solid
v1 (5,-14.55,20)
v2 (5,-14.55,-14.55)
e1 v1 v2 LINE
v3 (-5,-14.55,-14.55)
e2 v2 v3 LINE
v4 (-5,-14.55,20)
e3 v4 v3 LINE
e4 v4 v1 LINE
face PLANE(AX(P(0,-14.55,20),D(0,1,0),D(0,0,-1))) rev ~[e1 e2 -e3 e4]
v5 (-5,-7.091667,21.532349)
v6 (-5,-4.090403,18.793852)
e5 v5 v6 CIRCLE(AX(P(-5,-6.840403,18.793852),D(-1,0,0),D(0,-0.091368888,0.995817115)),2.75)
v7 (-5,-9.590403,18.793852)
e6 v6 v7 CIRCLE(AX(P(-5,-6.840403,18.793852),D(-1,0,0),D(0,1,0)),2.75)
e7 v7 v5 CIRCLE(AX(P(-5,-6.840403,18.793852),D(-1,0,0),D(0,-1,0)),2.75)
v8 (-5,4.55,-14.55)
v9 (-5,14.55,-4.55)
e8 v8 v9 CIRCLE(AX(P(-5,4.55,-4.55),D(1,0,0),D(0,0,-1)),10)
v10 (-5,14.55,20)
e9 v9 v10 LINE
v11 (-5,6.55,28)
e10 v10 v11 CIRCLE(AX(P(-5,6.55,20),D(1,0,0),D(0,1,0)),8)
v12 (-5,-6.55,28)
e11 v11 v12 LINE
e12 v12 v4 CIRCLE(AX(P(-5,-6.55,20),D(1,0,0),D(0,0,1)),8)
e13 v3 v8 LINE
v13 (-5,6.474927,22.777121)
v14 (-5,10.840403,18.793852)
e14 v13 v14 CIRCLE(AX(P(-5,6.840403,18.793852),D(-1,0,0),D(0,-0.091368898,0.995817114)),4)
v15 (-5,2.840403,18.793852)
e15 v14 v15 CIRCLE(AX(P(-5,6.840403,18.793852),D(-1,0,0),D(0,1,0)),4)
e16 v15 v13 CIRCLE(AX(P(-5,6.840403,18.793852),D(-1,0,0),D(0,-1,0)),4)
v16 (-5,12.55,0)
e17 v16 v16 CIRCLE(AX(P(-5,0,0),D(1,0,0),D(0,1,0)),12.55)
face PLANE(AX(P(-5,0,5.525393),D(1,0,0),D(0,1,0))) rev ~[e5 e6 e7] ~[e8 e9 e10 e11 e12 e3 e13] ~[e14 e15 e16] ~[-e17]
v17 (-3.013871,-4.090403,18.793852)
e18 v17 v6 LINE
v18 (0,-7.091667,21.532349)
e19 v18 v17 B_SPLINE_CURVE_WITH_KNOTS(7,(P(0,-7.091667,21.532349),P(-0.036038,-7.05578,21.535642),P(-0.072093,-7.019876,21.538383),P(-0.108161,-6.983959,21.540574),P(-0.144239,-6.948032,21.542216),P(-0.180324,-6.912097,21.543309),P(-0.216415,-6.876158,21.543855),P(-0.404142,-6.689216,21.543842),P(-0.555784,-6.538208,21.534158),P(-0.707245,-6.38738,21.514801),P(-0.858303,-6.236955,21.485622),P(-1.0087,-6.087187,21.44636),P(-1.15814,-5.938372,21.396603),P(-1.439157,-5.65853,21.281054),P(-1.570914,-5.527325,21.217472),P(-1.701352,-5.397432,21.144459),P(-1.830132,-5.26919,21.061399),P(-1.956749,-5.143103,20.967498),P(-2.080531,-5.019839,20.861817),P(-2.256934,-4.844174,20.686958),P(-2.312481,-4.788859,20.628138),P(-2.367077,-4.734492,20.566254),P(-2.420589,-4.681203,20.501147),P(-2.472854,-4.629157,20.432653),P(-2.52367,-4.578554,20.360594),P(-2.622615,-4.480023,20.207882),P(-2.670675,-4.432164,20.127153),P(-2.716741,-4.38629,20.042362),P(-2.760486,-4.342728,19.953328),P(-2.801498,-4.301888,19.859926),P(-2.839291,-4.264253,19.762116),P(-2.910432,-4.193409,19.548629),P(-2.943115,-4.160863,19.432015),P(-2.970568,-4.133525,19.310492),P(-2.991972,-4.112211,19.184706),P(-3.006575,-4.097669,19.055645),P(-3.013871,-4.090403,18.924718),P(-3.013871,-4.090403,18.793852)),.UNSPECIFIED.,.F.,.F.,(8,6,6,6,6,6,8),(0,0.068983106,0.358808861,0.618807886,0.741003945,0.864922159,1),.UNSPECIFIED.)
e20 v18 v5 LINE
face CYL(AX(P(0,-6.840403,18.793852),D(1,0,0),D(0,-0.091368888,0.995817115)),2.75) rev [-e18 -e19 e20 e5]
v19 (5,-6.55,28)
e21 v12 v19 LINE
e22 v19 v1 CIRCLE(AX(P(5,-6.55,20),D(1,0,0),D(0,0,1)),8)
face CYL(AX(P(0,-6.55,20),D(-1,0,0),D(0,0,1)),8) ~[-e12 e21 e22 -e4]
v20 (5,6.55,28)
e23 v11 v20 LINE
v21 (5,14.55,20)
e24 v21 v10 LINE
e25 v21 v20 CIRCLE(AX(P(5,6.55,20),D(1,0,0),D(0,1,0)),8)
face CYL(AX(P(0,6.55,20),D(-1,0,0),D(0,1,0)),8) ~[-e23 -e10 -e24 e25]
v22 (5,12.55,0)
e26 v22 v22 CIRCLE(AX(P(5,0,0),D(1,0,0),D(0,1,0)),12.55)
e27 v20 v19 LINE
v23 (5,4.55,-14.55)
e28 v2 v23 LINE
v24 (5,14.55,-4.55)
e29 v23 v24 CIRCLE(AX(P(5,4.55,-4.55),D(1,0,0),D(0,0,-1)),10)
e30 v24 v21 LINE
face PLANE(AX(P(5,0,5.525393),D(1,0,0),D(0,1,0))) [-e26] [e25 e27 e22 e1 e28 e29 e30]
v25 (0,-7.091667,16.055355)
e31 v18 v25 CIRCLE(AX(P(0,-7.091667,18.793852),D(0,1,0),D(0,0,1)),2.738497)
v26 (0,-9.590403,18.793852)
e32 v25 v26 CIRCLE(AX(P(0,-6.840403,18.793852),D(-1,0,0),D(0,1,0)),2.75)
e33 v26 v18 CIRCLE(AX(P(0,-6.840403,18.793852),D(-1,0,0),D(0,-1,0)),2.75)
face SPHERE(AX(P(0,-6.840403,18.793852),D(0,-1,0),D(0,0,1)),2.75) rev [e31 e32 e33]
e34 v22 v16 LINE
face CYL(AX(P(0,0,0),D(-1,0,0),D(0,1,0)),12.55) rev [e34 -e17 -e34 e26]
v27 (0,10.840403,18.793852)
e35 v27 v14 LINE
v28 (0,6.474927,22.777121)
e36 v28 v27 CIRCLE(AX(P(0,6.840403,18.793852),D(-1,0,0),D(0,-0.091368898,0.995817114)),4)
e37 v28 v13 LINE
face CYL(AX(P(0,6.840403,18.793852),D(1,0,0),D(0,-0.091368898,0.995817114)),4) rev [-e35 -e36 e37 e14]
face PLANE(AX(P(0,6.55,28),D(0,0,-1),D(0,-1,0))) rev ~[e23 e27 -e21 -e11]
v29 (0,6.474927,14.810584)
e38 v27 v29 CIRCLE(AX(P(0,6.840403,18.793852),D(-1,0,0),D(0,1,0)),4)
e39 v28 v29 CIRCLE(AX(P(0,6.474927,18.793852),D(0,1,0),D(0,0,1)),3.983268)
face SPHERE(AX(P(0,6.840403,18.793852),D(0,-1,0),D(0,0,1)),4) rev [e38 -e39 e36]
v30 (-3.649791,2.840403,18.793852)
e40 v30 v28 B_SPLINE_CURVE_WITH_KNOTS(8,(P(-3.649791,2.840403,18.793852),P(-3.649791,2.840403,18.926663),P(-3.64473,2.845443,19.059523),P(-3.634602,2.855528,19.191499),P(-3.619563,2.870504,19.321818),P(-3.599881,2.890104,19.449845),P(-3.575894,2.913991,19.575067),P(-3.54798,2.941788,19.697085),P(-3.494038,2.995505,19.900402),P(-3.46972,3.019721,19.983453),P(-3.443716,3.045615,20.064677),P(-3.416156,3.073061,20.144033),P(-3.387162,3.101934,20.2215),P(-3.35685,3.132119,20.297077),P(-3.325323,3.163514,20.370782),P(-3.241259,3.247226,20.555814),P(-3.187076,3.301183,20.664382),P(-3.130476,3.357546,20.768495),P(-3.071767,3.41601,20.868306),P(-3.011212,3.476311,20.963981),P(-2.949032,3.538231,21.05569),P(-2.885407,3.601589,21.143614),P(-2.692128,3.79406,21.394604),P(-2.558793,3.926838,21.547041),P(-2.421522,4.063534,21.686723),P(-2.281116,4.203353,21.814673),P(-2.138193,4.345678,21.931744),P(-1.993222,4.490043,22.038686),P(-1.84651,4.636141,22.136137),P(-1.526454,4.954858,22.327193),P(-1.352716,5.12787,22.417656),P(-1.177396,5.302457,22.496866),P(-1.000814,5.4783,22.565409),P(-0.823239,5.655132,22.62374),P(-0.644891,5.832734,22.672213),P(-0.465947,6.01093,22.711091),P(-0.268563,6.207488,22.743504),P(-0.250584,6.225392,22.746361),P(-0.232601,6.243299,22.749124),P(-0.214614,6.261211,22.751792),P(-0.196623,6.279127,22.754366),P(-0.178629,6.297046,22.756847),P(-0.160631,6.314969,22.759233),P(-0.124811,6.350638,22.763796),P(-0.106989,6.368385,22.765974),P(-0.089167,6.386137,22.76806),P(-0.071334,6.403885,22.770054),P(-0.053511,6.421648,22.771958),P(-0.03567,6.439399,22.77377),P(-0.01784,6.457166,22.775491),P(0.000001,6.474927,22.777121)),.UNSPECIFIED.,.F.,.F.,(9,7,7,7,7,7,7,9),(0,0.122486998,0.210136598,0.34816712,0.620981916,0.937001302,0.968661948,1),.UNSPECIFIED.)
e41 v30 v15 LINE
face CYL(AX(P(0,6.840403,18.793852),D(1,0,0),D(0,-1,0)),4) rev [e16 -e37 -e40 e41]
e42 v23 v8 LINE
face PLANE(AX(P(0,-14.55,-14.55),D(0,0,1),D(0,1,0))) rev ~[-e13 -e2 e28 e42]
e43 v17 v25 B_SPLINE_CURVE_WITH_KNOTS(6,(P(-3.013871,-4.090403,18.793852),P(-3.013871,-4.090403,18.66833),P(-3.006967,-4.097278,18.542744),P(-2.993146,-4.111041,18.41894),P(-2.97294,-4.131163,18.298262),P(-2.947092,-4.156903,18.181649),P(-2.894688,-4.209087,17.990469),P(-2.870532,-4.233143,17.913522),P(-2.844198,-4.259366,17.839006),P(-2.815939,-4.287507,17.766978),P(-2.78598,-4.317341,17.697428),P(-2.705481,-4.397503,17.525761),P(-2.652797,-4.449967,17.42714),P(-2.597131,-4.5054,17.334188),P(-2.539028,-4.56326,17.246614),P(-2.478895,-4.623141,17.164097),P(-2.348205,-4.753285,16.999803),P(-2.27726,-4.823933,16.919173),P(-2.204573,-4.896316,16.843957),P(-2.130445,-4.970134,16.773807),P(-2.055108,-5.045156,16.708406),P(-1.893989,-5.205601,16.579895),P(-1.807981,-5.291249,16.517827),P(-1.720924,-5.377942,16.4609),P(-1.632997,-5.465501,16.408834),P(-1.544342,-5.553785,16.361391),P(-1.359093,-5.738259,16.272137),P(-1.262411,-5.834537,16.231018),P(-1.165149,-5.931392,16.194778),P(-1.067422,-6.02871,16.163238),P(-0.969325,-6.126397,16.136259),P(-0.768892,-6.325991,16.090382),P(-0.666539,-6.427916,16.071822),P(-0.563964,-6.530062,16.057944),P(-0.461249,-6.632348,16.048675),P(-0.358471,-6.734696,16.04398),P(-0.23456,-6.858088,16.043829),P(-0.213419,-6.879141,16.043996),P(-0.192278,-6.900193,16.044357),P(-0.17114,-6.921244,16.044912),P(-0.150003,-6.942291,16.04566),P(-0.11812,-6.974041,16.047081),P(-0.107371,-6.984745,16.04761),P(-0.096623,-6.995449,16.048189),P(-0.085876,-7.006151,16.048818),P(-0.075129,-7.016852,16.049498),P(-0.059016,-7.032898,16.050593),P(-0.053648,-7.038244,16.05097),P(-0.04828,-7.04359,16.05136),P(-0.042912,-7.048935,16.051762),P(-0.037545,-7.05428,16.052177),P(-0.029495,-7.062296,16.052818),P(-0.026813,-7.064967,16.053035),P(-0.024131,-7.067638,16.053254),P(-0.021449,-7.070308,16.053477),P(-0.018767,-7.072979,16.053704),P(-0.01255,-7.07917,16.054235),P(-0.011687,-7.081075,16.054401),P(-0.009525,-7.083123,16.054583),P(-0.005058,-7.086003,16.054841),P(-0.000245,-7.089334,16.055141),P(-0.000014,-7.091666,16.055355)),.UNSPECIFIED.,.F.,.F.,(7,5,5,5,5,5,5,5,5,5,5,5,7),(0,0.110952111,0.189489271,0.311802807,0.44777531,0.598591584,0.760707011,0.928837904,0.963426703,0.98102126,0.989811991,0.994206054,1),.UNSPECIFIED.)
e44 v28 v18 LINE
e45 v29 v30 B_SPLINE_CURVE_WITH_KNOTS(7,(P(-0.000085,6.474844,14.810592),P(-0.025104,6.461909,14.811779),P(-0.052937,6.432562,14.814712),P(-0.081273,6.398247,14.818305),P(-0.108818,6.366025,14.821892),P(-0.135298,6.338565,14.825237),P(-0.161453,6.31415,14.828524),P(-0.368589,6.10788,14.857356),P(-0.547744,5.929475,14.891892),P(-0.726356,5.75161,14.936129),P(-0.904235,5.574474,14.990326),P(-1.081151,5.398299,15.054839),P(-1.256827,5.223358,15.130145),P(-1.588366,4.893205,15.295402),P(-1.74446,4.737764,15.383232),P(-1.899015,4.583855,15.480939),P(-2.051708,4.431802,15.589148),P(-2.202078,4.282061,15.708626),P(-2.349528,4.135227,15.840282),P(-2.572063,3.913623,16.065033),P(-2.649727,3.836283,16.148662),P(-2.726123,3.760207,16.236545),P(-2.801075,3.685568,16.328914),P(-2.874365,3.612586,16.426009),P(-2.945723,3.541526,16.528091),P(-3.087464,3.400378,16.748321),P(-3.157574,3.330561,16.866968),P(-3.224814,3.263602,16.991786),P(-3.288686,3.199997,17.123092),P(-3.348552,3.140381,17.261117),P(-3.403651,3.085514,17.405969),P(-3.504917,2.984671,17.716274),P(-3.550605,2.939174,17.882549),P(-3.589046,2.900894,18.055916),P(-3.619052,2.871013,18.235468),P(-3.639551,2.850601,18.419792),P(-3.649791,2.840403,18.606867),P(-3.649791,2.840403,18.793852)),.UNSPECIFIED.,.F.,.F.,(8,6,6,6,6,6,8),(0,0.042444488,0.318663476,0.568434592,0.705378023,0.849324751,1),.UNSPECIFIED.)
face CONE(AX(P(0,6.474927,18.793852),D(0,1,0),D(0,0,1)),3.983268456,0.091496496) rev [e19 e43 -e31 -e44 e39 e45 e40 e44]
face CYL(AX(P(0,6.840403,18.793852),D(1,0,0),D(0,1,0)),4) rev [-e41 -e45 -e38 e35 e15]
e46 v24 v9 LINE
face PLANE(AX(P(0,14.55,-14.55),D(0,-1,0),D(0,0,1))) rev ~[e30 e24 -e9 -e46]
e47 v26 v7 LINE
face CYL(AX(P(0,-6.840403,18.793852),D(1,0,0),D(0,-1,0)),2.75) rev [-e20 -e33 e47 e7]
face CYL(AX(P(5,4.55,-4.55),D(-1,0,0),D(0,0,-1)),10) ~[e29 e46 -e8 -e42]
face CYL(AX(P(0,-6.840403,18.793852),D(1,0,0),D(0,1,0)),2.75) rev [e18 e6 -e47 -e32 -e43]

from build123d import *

# Parameters (mm, degrees)
F0_R     = 12.55
F1_DEPTH = 5
F2_DEPTH = 5
F3_R     = 10


with BuildPart() as f1:
    # F0 (on Right) → F1 (new body)
    with BuildSketch(Plane.YZ):
        with BuildLine():
            ThreePointArc((14.55, 20), (12.2068542495, 25.6568542495), (6.55, 28))
            Line((6.55, 28), (-6.55, 28))
            ThreePointArc((-6.55, 28), (-12.2068542495, 25.6568542495), (-14.55, 20))
            Line((-14.55, 20), (-14.55, -14.55))
            Line((-14.55, -14.55), (14.55, -14.55))
            Line((14.55, -14.55), (14.55, 20))
        make_face()
        Circle(F0_R, mode=Mode.SUBTRACT)
        with BuildLine():
            Line((2.8404028665, 18.7938524157), (-4.0904028665, 18.7938524157))
            ThreePointArc((-4.0904028665, 18.7938524157), (-6.8404028665, 16.0438524157), (-9.5904028665, 18.7938524157))
            ThreePointArc((-9.5904028665, 18.7938524157), (-8.8718404378, 20.6474331111), (-7.0916673072, 21.5323494818))
            Line((-7.0916673072, 21.5323494818), (6.4749272755, 22.7771208717))
            ThreePointArc((6.4749272755, 22.7771208717), (9.5365202263, 21.748670715), (10.8404028665, 18.7938524157))
            ThreePointArc((10.8404028665, 18.7938524157), (6.8404028665, 14.7938524157), (2.8404028665, 18.7938524157))
        make_face(mode=Mode.SUBTRACT)
        with BuildLine():
            ThreePointArc((-7.0916673072, 21.5323494818), (-4.9868221712, 20.825289987), (-4.0904028665, 18.7938524157))
            Line((-4.0904028665, 18.7938524157), (2.8404028665, 18.7938524157))
            ThreePointArc((2.8404028665, 18.7938524157), (3.8855845672, 21.4899697755), (6.4749272755, 22.7771208717))
            Line((6.4749272755, 22.7771208717), (-7.0916673072, 21.5323494818))
        make_face()
    extrude(amount=-F1_DEPTH)

    # F0 (on Right) → F2 (join)
    with BuildSketch(Plane.YZ):
        with BuildLine():
            ThreePointArc((14.55, 20), (12.2068542495, 25.6568542495), (6.55, 28))
            Line((6.55, 28), (-6.55, 28))
            ThreePointArc((-6.55, 28), (-12.2068542495, 25.6568542495), (-14.55, 20))
            Line((-14.55, 20), (-14.55, -14.55))
            Line((-14.55, -14.55), (14.55, -14.55))
            Line((14.55, -14.55), (14.55, 20))
        make_face()
        Circle(F0_R, mode=Mode.SUBTRACT)
        with BuildLine():
            Line((2.8404028665, 18.7938524157), (-4.0904028665, 18.7938524157))
            ThreePointArc((-4.0904028665, 18.7938524157), (-6.8404028665, 16.0438524157), (-9.5904028665, 18.7938524157))
            ThreePointArc((-9.5904028665, 18.7938524157), (-8.8718404378, 20.6474331111), (-7.0916673072, 21.5323494818))
            Line((-7.0916673072, 21.5323494818), (6.4749272755, 22.7771208717))
            ThreePointArc((6.4749272755, 22.7771208717), (9.5365202263, 21.748670715), (10.8404028665, 18.7938524157))
            ThreePointArc((10.8404028665, 18.7938524157), (6.8404028665, 14.7938524157), (2.8404028665, 18.7938524157))
        make_face(mode=Mode.SUBTRACT)
        with BuildLine():
            ThreePointArc((-9.5904028665, 18.7938524157), (-6.8404028665, 16.0438524157), (-4.0904028665, 18.7938524157))
            Line((-4.0904028665, 18.7938524157), (-9.5904028665, 18.7938524157))
        make_face()
        with BuildLine():
            Line((-9.5904028665, 18.7938524157), (-4.0904028665, 18.7938524157))
            ThreePointArc((-4.0904028665, 18.7938524157), (-4.9868221712, 20.825289987), (-7.0916673072, 21.5323494818))
            ThreePointArc((-7.0916673072, 21.5323494818), (-8.8718404378, 20.6474331111), (-9.5904028665, 18.7938524157))
        make_face()
        with BuildLine():
            ThreePointArc((-7.0916673072, 21.5323494818), (-4.9868221712, 20.825289987), (-4.0904028665, 18.7938524157))
            Line((-4.0904028665, 18.7938524157), (2.8404028665, 18.7938524157))
            ThreePointArc((2.8404028665, 18.7938524157), (3.8855845672, 21.4899697755), (6.4749272755, 22.7771208717))
            Line((6.4749272755, 22.7771208717), (-7.0916673072, 21.5323494818))
        make_face()
        with BuildLine():
            ThreePointArc((6.4749272755, 22.7771208717), (3.8855845672, 21.4899697755), (2.8404028665, 18.7938524157))
            Line((2.8404028665, 18.7938524157), (10.8404028665, 18.7938524157))
            ThreePointArc((10.8404028665, 18.7938524157), (9.5365202263, 21.748670715), (6.4749272755, 22.7771208717))
        make_face()
        with BuildLine():
            Line((10.8404028665, 18.7938524157), (2.8404028665, 18.7938524157))
            ThreePointArc((2.8404028665, 18.7938524157), (6.8404028665, 14.7938524157), (10.8404028665, 18.7938524157))
        make_face()
    extrude(amount=F2_DEPTH)

    # F3
    f3_edges = [f1.edges().sort_by_distance(p)[0] for p in [
        (0, 14.55, -14.55),
    ]]
    fillet(f3_edges, radius=F3_R)

    # F0 (on Right) → F4 (revolve, cut)
    with BuildSketch(Plane.YZ):
        with BuildLine():
            Line((-9.5904028665, 18.7938524157), (-4.0904028665, 18.7938524157))
            ThreePointArc((-4.0904028665, 18.7938524157), (-4.9868221712, 20.825289987), (-7.0916673072, 21.5323494818))
            ThreePointArc((-7.0916673072, 21.5323494818), (-8.8718404378, 20.6474331111), (-9.5904028665, 18.7938524157))
        make_face()
        with BuildLine():
            ThreePointArc((-7.0916673072, 21.5323494818), (-4.9868221712, 20.825289987), (-4.0904028665, 18.7938524157))
            Line((-4.0904028665, 18.7938524157), (2.8404028665, 18.7938524157))
            ThreePointArc((2.8404028665, 18.7938524157), (3.8855845672, 21.4899697755), (6.4749272755, 22.7771208717))
            Line((6.4749272755, 22.7771208717), (-7.0916673072, 21.5323494818))
        make_face()
        with BuildLine():
            ThreePointArc((6.4749272755, 22.7771208717), (3.8855845672, 21.4899697755), (2.8404028665, 18.7938524157))
            Line((2.8404028665, 18.7938524157), (10.8404028665, 18.7938524157))
            ThreePointArc((10.8404028665, 18.7938524157), (9.5365202263, 21.748670715), (6.4749272755, 22.7771208717))
        make_face()
    revolve(axis=Axis((0, 0.625, 18.7938524157), (0, 1, 0)), mode=Mode.SUBTRACT)


solid = f1.part
